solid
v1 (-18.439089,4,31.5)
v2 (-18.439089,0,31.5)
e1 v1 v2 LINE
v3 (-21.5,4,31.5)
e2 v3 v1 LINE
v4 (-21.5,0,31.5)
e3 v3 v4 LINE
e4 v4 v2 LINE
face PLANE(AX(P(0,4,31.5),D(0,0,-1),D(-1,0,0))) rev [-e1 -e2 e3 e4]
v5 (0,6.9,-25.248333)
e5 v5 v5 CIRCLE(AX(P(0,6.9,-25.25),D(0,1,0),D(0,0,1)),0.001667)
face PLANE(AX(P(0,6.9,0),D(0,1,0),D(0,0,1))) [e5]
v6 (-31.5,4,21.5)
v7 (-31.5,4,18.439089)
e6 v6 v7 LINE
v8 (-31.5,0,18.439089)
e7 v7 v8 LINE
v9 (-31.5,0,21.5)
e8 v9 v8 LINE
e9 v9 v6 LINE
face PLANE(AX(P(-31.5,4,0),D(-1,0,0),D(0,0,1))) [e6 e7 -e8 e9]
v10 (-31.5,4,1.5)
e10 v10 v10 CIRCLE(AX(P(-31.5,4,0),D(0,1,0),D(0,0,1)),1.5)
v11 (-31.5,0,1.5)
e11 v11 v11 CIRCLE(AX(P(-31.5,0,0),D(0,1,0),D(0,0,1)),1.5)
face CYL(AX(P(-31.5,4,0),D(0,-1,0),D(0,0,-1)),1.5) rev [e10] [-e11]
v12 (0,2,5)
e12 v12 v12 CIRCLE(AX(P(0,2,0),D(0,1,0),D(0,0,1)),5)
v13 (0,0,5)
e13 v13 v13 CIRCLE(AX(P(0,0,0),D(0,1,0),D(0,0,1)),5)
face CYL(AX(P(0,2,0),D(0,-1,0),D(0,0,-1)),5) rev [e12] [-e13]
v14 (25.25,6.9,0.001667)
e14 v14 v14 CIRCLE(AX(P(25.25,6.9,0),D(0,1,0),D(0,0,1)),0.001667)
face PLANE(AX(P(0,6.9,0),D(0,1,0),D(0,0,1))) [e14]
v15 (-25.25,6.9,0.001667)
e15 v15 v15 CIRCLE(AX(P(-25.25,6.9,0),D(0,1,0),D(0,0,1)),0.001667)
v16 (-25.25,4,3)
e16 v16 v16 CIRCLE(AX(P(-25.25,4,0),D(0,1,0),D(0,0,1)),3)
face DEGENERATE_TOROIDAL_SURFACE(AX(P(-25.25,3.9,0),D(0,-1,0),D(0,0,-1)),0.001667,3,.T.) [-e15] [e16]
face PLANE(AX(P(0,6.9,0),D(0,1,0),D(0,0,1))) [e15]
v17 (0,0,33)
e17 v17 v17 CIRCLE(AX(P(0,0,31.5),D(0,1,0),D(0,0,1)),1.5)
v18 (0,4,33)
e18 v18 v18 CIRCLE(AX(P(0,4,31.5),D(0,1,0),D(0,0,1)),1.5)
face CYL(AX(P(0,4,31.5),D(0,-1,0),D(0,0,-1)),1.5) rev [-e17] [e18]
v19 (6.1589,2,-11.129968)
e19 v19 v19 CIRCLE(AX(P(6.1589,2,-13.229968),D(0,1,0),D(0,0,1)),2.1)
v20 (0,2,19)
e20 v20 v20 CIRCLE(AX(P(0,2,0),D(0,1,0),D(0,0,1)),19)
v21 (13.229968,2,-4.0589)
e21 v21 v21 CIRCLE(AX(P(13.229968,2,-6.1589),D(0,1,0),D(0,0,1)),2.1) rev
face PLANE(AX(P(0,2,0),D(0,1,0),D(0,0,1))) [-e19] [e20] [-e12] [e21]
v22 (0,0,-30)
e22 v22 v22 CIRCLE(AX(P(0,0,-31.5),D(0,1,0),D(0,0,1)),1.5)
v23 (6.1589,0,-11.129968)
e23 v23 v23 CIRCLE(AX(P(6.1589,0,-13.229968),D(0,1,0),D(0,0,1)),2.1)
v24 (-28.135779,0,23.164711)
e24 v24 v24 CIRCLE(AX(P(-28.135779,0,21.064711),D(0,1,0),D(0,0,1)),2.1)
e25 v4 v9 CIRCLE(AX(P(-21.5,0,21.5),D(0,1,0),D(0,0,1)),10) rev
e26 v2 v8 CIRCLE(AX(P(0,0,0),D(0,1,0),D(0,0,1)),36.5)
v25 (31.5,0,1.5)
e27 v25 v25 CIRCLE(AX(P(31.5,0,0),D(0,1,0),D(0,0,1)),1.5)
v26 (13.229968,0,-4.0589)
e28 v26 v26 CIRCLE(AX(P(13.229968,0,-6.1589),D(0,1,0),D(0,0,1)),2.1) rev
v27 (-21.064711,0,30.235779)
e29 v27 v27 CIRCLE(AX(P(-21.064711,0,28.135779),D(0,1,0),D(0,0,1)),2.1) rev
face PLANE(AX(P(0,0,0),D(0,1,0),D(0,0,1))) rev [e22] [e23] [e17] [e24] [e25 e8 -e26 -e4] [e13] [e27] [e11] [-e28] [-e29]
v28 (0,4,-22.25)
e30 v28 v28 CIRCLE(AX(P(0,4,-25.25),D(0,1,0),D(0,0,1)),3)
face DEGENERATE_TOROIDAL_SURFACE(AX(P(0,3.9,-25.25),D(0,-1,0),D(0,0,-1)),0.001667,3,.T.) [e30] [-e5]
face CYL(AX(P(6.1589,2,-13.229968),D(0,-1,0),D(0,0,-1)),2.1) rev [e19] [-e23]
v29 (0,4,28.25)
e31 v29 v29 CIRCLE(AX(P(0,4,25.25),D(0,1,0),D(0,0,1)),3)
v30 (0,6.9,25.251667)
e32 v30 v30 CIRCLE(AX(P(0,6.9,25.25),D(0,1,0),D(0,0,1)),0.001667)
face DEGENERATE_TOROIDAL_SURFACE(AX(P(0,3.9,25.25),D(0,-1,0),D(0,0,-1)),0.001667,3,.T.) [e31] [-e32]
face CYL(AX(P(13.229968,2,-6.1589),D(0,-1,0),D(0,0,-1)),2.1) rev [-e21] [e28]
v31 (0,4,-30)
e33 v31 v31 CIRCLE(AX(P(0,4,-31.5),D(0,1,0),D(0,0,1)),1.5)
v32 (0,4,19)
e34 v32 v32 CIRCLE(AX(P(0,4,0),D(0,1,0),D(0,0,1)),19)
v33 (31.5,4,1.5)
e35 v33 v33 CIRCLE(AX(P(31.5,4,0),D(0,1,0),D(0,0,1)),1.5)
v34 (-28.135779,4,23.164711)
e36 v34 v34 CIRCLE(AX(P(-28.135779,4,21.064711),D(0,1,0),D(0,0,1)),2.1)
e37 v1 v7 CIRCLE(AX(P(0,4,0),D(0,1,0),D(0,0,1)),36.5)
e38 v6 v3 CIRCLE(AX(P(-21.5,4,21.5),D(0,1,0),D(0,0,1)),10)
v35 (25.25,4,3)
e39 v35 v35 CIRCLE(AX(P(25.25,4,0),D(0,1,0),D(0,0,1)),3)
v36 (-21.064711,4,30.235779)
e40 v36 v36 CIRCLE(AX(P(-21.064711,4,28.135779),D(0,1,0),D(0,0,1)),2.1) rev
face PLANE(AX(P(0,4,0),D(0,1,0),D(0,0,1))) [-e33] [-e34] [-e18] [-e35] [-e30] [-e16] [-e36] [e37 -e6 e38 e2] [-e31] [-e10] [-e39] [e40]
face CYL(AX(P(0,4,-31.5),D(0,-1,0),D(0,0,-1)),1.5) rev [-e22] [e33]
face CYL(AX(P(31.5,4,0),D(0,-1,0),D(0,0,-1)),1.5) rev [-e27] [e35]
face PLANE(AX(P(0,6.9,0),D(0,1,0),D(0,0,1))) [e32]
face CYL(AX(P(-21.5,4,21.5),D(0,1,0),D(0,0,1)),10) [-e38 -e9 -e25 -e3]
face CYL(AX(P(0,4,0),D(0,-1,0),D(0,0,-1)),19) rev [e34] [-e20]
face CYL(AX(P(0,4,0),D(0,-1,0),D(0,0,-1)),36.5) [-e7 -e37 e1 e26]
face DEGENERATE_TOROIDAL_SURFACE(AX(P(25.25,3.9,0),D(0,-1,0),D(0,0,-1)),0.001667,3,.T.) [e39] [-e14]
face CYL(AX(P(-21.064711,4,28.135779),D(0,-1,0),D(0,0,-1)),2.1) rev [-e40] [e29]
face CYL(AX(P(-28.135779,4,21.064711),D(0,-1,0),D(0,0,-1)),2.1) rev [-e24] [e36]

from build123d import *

# Parameters (mm, degrees)
SKETCH1_R           = 2.1
SKETCH1_R_2         = 1.5
SKETCH1_R_3         = 3
SKETCH1_R_4         = 19
BOSS_EXTRUDE1_DEPTH = 4
BOSS_EXTRUDE2_DEPTH = 2
FILLET1_R           = 10
SKETCH1_4_R         = 3
BOSS_EXTRUDE3_DEPTH = 6.9
FILLET2_R           = 3


with BuildPart() as part:
    # Sketch1 → Boss-Extrude1 (new body)
    with BuildSketch(Plane(origin=(0, 0, 0), x_dir=(1, 0, 0), z_dir=(0, 1, 0))):
        with BuildLine():
            ThreePointArc((-18.439088915, -31.5), (25.809397513, 25.809397513), (-31.5, -18.439088915))
            Line((-31.5, -18.439088915), (-31.5, -31.5))
            Line((-31.5, -31.5), (-18.439088915, -31.5))
        make_face()
        with Locations(Location((-28.135778823, -21.064711012, 0), (0, 0, 270))):
            Circle(SKETCH1_R, mode=Mode.SUBTRACT)
        with Locations(Location((-21.064711012, -28.135778823, 0), (0, 0, 270))):
            Circle(SKETCH1_R, mode=Mode.SUBTRACT)
        with Locations(Location((0, -31.5, 0), (0, 0, 270))):
            Circle(SKETCH1_R_2, mode=Mode.SUBTRACT)
        with Locations(Location((0, -25.25, 0), (0, 0, 270))):
            Circle(SKETCH1_R_3, mode=Mode.SUBTRACT)
        with Locations(Location((-31.5, 0, 0), (0, 0, 270))):
            Circle(SKETCH1_R_2, mode=Mode.SUBTRACT)
        with Locations(Location((-25.25, 0, 0), (0, 0, 270))):
            Circle(SKETCH1_R_3, mode=Mode.SUBTRACT)
        with Locations(Location((0, 0, 0), (0, 0, 270))):
            Circle(SKETCH1_R_4, mode=Mode.SUBTRACT)
        with Locations(Location((25.25, 0, 0), (0, 0, 270))):
            Circle(SKETCH1_R_3, mode=Mode.SUBTRACT)
        with Locations(Location((31.5, 0, 0), (0, 0, 270))):
            Circle(SKETCH1_R_2, mode=Mode.SUBTRACT)
        with Locations(Location((0, 25.25, 0), (0, 0, 270))):
            Circle(SKETCH1_R_3, mode=Mode.SUBTRACT)
        with Locations(Location((0, 31.5, 0), (0, 0, 270))):
            Circle(SKETCH1_R_2, mode=Mode.SUBTRACT)
    extrude(amount=BOSS_EXTRUDE1_DEPTH)

    # Sketch1<3> → Boss-Extrude2 (add)
    with BuildSketch(Plane(origin=(0, 0, 0), x_dir=(1, 0, 0), z_dir=(0, 1, 0))):
        with BuildLine():
            ThreePointArc((0, 19), (-17.553711118, 7.270985215), (-13.435028843, -13.435028843))
            ThreePointArc((-13.435028843, -13.435028843), (7.270985215, -17.553711118), (19, 0))
            ThreePointArc((19, 0), (13.435028843, 13.435028843), (0, 19))
        make_face()
        with BuildLine():
            ThreePointArc((-3.535533906, -3.535533906), (-3.535533906, 3.535533906), (3.535533906, 3.535533906))
            ThreePointArc((3.535533906, 3.535533906), (4.619397663, 1.913417162), (5, 0))
            ThreePointArc((5, 0), (1.913417162, -4.619397663), (-3.535533906, -3.535533906))
        make_face(mode=Mode.SUBTRACT)
        with BuildLine():
            ThreePointArc((15.329967876, 6.158900064), (12.426332668, 4.218753046), (11.745043636, 7.643824305))
            ThreePointArc((11.745043636, 7.643824305), (14.033603084, 8.099047082), (15.329967876, 6.158900064))
        make_face(mode=Mode.SUBTRACT)
        with BuildLine():
            ThreePointArc((8.258900064, 13.229967876), (8.099047082, 12.426332668), (7.643824305, 11.745043636))
            ThreePointArc((7.643824305, 11.745043636), (4.218753046, 14.033603084), (8.258900064, 13.229967876))
        make_face(mode=Mode.SUBTRACT)
    extrude(amount=BOSS_EXTRUDE2_DEPTH)

    # Fillet1
    fillet1_edges = [part.edges().sort_by_distance(p)[0] for p in [
        (-31.5, 2, 31.5),
    ]]
    fillet(fillet1_edges, radius=FILLET1_R)

    # Sketch1<4> → Boss-Extrude3 (add)
    with BuildSketch(Plane(origin=(0, 0, 0), x_dir=(1, 0, 0), z_dir=(0, 1, 0))):
        with Locations(Location((0, 25.25, 0), (0, 0, 90))):
            Circle(SKETCH1_4_R)
        with Locations(Location((25.25, 0, 0), (0, 0, 90))):
            Circle(SKETCH1_4_R)
        with Locations(Location((0, -25.25, 0), (0, 0, 90))):
            Circle(SKETCH1_4_R)
        with Locations(Location((-25.25, 0, 0), (0, 0, 90))):
            Circle(SKETCH1_4_R)
    extrude(amount=BOSS_EXTRUDE3_DEPTH)

    # Fillet2
    # the kernel refuses this fillet: 3 mm, written as the material it takes off along each edge
    with BuildSketch(Plane(origin=(0, 6.9, -25.25), x_dir=(0, 0, -1), z_dir=(1, 0, 0))) as fillet2_piece_1:
        with BuildLine():
            CenterArc((0.00166713, -3), FILLET2_R, 1.910213172, 88.089786828)
            Line((0.00166713, 0), (0.00166713, 0.06))
            Line((0.00166713, 0.06), (3, 0.06))
            Line((3, 0.06), (3.06, 0))
            ThreePointArc((3.06, 0), (3.06, -1.45), (3.059966657, -2.898))
            Line((3.059966657, -2.898), (3, -2.9))
        make_face()
    revolve(axis=Axis((0, 6.9, -25.25), (0, 1, 0)), mode=Mode.SUBTRACT)
    with BuildSketch(Plane(origin=(-25.25, 6.9, 0), x_dir=(0, 0, -1), z_dir=(1, 0, 0))) as fillet2_piece_2:
        with BuildLine():
            CenterArc((0.00166713, -3), FILLET2_R, 1.910213172, 88.089786828)
            Line((0.00166713, 0), (0.00166713, 0.06))
            Line((0.00166713, 0.06), (3, 0.06))
            Line((3, 0.06), (3.06, 0))
            ThreePointArc((3.06, 0), (3.06, -1.45), (3.059966657, -2.898))
            Line((3.059966657, -2.898), (3, -2.9))
        make_face()
    revolve(axis=Axis((-25.25, 6.9, 0), (0, 1, 0)), mode=Mode.SUBTRACT)
    with BuildSketch(Plane(origin=(25.25, 6.9, 0), x_dir=(0, 0, -1), z_dir=(1, 0, 0))) as fillet2_piece_3:
        with BuildLine():
            CenterArc((0.00166713, -3), FILLET2_R, 1.910213172, 88.089786828)
            Line((0.00166713, 0), (0.00166713, 0.06))
            Line((0.00166713, 0.06), (3, 0.06))
            Line((3, 0.06), (3.06, 0))
            ThreePointArc((3.06, 0), (3.06, -1.45), (3.059966657, -2.898))
            Line((3.059966657, -2.898), (3, -2.9))
        make_face()
    revolve(axis=Axis((25.25, 6.9, 0), (0, 1, 0)), mode=Mode.SUBTRACT)
    with BuildSketch(Plane(origin=(0, 6.9, 25.25), x_dir=(0, 0, -1), z_dir=(1, 0, 0))) as fillet2_piece_4:
        with BuildLine():
            CenterArc((0.00166713, -3), FILLET2_R, 1.910213172, 88.089786828)
            Line((0.00166713, 0), (0.00166713, 0.06))
            Line((0.00166713, 0.06), (3, 0.06))
            Line((3, 0.06), (3.06, 0))
            ThreePointArc((3.06, 0), (3.06, -1.45), (3.059966657, -2.898))
            Line((3.059966657, -2.898), (3, -2.9))
        make_face()
    revolve(axis=Axis((0, 6.9, 25.25), (0, 1, 0)), mode=Mode.SUBTRACT)


solid = part.part
